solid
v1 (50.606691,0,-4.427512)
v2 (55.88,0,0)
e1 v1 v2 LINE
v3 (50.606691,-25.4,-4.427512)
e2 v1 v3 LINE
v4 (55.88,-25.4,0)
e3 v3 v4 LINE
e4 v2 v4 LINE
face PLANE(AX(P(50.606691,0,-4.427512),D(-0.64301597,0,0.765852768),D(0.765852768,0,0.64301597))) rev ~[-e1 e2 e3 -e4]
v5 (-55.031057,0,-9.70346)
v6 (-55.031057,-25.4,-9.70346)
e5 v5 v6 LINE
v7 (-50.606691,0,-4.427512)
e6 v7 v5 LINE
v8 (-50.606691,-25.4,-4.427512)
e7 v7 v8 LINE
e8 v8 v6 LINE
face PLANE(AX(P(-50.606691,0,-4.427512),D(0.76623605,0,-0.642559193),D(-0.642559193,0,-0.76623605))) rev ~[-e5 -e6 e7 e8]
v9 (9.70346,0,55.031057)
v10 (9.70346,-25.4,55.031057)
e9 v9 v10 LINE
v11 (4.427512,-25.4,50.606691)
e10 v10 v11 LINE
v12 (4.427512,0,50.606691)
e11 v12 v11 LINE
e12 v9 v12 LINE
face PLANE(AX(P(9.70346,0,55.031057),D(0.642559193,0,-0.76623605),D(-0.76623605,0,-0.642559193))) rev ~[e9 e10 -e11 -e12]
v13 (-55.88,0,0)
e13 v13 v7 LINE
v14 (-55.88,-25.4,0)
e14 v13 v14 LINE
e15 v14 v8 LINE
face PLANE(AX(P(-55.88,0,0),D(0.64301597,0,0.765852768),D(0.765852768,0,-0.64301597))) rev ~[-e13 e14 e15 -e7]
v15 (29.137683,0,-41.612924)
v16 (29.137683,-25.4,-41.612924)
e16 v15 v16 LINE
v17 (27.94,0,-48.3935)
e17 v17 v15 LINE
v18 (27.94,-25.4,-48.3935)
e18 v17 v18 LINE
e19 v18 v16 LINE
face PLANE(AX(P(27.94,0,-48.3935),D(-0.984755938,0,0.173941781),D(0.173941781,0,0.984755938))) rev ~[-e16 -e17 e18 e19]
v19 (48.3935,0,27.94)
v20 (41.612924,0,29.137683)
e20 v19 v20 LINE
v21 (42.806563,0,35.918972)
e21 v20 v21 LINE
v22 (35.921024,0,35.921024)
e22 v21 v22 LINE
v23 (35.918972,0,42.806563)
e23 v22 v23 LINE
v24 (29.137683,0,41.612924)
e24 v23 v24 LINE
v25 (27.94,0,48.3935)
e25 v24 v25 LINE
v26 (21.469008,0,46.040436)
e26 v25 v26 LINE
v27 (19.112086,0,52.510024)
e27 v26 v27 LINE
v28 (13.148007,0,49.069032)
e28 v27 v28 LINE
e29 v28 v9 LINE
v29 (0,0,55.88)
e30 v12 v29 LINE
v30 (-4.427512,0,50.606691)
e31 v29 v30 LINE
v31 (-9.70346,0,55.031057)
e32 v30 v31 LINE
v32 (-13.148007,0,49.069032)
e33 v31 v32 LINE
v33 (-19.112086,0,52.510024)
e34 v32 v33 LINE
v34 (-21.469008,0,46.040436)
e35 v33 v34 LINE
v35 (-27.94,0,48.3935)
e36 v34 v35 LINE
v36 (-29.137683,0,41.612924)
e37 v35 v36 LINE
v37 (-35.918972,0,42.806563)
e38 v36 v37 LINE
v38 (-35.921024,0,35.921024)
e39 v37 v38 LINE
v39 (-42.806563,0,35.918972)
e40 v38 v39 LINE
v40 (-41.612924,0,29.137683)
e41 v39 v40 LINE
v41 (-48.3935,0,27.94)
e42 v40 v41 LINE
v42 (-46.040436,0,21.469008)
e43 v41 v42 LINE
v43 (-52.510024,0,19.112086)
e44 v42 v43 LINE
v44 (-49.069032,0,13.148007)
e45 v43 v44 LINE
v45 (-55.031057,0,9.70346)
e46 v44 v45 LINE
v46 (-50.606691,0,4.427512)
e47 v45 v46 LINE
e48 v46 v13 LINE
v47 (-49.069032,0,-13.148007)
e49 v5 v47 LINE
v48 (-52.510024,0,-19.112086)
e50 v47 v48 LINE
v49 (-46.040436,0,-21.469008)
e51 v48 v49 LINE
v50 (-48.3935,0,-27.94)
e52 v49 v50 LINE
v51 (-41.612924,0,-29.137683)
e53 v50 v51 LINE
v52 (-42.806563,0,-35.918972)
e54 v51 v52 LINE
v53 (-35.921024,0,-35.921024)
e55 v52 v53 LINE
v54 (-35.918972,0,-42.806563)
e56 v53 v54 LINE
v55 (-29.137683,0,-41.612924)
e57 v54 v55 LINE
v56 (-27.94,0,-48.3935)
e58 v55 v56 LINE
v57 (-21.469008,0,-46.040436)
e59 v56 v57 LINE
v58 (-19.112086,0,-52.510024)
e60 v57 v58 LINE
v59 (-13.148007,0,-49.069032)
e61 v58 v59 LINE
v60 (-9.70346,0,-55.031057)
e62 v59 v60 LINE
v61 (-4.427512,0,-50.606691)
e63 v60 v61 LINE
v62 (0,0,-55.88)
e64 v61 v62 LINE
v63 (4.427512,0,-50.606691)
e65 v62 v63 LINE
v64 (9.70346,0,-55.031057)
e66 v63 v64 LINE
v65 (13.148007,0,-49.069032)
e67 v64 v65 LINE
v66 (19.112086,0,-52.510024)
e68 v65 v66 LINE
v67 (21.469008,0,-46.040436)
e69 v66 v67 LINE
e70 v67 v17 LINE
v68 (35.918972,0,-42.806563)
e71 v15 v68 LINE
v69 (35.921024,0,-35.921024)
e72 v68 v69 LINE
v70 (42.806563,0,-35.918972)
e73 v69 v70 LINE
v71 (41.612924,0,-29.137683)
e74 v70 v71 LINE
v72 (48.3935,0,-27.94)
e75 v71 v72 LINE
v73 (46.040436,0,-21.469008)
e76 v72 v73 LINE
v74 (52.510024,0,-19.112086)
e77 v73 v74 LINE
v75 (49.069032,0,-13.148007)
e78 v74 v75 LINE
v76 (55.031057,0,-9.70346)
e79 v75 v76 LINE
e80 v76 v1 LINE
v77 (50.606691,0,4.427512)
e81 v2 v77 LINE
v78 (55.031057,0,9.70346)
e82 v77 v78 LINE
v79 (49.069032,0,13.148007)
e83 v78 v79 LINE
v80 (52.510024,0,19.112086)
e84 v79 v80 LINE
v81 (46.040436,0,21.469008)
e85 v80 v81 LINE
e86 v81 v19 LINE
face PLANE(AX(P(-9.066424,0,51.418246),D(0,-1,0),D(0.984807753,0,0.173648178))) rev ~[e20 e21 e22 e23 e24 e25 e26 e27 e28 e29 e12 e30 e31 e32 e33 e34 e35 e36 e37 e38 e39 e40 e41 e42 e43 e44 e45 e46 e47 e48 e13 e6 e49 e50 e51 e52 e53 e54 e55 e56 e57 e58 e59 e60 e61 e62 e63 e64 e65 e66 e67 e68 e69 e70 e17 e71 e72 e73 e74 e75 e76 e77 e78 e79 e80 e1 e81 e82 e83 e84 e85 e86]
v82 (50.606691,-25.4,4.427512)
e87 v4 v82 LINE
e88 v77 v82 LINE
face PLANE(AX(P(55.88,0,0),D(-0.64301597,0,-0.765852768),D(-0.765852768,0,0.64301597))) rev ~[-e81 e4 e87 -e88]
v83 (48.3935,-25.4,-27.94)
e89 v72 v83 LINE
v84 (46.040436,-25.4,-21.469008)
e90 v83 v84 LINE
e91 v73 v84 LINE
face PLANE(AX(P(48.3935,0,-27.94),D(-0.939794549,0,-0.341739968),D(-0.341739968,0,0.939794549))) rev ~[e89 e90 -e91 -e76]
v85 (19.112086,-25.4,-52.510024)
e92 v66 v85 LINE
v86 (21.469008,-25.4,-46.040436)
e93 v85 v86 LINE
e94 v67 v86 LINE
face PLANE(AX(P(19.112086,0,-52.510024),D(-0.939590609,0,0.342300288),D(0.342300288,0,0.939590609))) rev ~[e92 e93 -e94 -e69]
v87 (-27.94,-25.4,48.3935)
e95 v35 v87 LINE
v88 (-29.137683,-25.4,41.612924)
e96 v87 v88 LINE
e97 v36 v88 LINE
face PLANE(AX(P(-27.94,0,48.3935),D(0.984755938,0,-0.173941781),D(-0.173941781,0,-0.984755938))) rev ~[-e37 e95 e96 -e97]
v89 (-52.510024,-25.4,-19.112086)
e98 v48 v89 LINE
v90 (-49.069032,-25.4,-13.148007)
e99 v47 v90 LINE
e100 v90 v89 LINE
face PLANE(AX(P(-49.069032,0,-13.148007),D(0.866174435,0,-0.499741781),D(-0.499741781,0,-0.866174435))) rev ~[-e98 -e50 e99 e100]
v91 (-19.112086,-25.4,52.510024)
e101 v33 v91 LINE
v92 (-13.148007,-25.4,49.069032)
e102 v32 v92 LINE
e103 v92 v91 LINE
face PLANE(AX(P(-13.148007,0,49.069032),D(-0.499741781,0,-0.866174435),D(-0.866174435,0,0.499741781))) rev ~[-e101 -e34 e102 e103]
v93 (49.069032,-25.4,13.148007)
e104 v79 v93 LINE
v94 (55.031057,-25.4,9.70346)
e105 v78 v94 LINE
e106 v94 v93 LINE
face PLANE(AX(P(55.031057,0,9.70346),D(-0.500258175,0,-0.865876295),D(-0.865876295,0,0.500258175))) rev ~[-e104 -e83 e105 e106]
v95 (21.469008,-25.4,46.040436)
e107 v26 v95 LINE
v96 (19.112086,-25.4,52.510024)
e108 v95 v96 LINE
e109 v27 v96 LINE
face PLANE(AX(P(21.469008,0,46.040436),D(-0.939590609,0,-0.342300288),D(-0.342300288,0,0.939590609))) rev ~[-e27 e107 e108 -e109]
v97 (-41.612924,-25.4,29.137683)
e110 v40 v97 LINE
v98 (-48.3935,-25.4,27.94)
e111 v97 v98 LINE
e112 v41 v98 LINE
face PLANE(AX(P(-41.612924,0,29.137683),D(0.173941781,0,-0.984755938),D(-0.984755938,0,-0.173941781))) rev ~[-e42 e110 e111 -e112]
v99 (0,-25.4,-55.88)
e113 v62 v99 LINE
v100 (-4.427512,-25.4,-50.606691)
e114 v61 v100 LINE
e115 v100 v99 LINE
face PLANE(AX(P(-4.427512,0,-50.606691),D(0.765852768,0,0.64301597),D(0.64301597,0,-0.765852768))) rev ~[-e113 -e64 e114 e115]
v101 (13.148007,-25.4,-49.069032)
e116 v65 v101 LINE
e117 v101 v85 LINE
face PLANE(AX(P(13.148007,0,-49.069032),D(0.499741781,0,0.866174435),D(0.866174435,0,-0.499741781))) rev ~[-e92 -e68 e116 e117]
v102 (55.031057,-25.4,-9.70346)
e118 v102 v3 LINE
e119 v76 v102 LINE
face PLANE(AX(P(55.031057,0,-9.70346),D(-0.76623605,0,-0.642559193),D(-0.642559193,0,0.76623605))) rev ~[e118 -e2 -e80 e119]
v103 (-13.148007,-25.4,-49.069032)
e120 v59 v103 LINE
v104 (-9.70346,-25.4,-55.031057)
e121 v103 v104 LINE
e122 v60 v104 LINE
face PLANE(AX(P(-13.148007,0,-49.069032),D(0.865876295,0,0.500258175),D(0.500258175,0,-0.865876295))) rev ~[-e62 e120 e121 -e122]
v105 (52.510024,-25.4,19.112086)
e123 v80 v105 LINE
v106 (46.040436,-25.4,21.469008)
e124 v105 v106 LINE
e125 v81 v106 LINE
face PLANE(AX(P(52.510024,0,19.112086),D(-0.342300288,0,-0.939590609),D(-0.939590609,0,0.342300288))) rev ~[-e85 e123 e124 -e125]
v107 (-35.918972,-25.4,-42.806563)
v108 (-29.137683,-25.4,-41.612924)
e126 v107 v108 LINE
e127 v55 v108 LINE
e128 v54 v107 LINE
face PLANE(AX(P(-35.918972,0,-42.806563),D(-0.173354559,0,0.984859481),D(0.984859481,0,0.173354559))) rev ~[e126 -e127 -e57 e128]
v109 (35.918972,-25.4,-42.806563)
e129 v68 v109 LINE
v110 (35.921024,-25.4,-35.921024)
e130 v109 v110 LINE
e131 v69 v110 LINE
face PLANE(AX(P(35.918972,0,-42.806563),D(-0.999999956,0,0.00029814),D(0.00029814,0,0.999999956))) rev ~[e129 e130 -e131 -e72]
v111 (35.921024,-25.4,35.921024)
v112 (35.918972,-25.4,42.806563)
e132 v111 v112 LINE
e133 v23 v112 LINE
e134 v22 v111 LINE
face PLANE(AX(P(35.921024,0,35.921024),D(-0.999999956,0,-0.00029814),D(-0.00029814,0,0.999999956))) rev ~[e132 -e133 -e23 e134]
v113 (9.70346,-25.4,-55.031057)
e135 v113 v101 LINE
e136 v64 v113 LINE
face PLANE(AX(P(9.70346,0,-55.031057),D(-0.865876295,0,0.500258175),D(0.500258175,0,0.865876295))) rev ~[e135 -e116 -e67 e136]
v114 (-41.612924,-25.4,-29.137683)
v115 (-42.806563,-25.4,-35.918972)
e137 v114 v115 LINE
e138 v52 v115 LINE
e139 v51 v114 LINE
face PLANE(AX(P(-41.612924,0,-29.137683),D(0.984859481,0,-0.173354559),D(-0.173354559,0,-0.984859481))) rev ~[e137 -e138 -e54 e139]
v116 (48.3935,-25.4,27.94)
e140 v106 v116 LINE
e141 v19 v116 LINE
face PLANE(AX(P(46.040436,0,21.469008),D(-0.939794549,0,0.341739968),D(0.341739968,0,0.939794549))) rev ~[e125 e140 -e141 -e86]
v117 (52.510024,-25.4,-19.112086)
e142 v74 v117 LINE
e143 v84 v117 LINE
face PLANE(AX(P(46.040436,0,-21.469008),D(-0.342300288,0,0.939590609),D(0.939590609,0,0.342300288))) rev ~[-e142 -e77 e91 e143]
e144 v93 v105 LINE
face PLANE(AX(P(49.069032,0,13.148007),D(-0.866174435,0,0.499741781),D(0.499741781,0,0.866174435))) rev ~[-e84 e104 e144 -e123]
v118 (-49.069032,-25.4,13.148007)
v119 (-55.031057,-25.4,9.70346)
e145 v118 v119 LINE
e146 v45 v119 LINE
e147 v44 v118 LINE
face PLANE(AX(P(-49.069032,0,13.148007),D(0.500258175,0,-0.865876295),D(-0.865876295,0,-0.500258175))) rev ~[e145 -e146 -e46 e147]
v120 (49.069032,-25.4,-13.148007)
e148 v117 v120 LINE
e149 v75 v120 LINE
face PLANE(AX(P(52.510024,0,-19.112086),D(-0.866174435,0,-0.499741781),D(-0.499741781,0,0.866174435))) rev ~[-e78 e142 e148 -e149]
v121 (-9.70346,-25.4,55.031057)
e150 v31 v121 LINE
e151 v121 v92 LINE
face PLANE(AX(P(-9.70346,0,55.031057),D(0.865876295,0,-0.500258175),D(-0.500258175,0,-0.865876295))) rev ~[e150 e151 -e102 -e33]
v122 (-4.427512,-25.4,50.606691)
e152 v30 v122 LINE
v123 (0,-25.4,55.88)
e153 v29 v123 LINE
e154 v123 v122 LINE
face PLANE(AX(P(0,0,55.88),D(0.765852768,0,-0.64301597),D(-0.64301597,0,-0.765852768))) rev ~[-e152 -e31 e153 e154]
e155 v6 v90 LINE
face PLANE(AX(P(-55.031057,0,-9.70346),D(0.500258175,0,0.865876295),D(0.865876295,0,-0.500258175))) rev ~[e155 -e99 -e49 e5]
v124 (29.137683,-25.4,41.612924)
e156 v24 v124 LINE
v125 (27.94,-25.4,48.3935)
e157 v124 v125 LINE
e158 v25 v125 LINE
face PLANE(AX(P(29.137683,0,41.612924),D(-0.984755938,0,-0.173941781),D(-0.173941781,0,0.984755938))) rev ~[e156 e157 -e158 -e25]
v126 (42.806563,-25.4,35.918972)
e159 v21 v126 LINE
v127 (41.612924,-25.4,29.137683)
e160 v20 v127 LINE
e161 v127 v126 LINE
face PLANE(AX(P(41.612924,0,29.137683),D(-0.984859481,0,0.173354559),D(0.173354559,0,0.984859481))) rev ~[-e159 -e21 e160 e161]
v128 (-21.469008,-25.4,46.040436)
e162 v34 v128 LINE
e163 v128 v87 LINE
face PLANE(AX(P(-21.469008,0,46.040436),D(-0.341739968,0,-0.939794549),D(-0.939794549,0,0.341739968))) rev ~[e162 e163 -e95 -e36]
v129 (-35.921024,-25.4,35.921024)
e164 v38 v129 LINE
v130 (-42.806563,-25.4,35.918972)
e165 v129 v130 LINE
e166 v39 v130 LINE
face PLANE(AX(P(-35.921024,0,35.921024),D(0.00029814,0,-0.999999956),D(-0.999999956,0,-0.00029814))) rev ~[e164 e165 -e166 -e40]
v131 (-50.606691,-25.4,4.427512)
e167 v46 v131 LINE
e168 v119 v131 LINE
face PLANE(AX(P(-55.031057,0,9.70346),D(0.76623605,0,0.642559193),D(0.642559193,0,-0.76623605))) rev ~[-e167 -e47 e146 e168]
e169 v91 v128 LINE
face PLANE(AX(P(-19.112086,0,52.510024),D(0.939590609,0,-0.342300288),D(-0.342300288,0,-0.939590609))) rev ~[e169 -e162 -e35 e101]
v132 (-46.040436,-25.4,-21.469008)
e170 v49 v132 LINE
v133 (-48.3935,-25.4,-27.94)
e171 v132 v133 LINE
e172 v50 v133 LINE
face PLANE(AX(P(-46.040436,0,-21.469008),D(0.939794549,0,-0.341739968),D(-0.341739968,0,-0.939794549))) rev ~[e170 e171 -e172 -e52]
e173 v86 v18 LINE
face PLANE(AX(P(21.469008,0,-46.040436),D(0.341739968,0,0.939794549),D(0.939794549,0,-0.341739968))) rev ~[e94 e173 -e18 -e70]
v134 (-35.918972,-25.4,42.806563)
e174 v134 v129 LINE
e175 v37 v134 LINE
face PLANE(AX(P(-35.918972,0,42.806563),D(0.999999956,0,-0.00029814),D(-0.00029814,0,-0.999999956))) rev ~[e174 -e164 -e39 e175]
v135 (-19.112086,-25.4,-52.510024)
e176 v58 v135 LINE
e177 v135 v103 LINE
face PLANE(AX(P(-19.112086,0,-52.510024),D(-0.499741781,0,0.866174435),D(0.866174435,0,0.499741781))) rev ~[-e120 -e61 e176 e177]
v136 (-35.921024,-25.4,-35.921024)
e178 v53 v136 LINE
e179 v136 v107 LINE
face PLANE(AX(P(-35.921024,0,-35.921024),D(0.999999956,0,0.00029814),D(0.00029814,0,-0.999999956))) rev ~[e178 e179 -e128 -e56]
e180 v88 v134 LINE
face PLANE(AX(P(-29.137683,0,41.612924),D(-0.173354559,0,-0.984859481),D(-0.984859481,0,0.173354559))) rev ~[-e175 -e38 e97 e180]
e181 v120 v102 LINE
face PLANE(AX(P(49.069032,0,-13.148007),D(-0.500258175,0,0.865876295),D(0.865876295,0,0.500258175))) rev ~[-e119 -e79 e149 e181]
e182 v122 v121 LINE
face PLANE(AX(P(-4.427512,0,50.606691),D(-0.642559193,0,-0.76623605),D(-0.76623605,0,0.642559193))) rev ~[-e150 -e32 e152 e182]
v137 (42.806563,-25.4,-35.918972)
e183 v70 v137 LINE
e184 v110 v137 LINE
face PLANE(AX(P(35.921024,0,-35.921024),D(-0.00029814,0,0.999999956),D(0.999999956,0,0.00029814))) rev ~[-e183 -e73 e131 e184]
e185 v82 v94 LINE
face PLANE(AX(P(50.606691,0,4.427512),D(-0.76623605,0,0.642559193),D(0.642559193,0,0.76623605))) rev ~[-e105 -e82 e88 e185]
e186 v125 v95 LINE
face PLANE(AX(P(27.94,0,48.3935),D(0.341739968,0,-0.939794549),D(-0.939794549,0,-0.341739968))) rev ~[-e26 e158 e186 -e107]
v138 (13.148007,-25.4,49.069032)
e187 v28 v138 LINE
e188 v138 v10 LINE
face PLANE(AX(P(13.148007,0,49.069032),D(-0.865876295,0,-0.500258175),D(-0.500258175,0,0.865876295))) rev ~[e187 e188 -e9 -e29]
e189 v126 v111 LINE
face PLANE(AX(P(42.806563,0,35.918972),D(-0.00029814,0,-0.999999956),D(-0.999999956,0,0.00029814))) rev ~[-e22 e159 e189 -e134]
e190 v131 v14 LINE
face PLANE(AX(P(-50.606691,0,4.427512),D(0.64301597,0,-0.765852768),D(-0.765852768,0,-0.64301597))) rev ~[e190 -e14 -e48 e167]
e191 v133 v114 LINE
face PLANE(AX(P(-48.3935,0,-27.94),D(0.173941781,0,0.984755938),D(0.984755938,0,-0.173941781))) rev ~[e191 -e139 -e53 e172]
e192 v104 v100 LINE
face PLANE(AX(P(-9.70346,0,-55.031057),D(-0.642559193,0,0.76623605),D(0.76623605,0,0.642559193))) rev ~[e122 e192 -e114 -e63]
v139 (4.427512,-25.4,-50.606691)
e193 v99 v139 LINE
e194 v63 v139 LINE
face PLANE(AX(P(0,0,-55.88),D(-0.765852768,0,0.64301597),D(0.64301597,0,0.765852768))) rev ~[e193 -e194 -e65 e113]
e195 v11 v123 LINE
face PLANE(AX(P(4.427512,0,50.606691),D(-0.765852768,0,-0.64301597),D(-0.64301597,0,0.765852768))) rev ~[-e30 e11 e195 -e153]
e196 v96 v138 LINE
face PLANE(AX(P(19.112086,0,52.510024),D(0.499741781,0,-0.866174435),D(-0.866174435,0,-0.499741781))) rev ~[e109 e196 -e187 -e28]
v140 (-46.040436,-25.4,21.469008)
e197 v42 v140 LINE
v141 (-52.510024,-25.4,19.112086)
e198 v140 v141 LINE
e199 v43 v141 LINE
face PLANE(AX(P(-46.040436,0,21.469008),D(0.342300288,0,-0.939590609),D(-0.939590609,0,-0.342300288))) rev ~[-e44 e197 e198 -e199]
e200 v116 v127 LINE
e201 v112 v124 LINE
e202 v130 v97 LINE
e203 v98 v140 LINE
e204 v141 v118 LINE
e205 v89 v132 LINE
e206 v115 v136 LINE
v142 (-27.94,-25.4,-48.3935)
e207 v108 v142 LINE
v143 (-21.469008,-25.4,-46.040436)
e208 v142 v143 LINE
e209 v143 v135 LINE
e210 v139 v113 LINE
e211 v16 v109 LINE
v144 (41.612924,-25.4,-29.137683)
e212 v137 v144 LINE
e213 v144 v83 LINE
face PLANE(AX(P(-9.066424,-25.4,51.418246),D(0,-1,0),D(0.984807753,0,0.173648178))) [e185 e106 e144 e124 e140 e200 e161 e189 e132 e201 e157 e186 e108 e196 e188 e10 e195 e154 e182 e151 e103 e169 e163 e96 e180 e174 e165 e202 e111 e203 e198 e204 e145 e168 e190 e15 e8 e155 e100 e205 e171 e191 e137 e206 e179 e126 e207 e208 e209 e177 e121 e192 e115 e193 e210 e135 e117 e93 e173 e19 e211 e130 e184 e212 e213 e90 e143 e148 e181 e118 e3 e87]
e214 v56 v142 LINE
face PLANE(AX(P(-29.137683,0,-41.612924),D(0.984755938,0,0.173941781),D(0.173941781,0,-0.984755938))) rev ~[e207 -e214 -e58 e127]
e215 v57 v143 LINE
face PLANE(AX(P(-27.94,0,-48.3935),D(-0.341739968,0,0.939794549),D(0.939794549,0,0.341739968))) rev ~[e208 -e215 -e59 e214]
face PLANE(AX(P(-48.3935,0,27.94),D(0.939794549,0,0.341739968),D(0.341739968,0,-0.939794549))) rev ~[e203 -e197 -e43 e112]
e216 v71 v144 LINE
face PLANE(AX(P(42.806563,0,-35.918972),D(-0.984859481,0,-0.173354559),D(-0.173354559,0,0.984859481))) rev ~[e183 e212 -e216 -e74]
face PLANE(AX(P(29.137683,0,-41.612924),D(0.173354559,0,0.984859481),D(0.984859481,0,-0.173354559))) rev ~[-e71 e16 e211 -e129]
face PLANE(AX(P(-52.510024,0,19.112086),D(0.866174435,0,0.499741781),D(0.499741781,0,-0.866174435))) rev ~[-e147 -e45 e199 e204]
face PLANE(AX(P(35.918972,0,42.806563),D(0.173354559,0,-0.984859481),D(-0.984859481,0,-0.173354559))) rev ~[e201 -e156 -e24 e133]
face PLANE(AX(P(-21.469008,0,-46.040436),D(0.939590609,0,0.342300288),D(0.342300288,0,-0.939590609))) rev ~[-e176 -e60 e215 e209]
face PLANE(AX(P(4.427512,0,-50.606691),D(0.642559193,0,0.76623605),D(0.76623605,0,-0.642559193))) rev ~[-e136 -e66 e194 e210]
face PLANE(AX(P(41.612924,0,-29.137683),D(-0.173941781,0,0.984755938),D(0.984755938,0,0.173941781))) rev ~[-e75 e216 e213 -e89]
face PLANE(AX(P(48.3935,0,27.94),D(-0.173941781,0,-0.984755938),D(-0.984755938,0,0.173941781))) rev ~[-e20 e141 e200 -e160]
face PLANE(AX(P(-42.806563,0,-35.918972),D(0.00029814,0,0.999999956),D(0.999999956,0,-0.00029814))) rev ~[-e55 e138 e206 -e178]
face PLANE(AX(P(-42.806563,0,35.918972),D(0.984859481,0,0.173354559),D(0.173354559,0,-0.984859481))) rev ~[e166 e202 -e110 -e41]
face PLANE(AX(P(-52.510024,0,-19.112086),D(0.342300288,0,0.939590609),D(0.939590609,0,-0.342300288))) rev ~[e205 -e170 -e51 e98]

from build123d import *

# Parameters (mm, degrees)
F0_R            = 50.8
F1_DEPTH        = 25.4
F3_DEPTH        = 25.4
F3_COPIES_COUNT = 36


# Not quite as in the source:
# - a pattern or mirror of a feature is missing from the dataset's text; its kind, count and spacing are read off the source's solid


with BuildPart() as f1:
    # F0 (on Front) → F1 (new body)
    with BuildSketch(Plane.XZ):
        Circle(F0_R)
    extrude(amount=F1_DEPTH)

    # F2 (on Front) → F3 (join, through all)
    with BuildSketch(Plane.XZ):
        Polygon((4.4275117316, 50.6066906631), (0, 55.88), (-4.4275117316, 50.6066906631), align=None)
    f3 = extrude(amount=F3_DEPTH)

    # F3_copies: F3 ×36 about axis
    f3_copies_axis = Axis((0, 0, 0), (0, 1, 0))
    for i in range(1, F3_COPIES_COUNT):
        add(f3.rotate(f3_copies_axis, i * 360 / F3_COPIES_COUNT))


solid = f1.part
